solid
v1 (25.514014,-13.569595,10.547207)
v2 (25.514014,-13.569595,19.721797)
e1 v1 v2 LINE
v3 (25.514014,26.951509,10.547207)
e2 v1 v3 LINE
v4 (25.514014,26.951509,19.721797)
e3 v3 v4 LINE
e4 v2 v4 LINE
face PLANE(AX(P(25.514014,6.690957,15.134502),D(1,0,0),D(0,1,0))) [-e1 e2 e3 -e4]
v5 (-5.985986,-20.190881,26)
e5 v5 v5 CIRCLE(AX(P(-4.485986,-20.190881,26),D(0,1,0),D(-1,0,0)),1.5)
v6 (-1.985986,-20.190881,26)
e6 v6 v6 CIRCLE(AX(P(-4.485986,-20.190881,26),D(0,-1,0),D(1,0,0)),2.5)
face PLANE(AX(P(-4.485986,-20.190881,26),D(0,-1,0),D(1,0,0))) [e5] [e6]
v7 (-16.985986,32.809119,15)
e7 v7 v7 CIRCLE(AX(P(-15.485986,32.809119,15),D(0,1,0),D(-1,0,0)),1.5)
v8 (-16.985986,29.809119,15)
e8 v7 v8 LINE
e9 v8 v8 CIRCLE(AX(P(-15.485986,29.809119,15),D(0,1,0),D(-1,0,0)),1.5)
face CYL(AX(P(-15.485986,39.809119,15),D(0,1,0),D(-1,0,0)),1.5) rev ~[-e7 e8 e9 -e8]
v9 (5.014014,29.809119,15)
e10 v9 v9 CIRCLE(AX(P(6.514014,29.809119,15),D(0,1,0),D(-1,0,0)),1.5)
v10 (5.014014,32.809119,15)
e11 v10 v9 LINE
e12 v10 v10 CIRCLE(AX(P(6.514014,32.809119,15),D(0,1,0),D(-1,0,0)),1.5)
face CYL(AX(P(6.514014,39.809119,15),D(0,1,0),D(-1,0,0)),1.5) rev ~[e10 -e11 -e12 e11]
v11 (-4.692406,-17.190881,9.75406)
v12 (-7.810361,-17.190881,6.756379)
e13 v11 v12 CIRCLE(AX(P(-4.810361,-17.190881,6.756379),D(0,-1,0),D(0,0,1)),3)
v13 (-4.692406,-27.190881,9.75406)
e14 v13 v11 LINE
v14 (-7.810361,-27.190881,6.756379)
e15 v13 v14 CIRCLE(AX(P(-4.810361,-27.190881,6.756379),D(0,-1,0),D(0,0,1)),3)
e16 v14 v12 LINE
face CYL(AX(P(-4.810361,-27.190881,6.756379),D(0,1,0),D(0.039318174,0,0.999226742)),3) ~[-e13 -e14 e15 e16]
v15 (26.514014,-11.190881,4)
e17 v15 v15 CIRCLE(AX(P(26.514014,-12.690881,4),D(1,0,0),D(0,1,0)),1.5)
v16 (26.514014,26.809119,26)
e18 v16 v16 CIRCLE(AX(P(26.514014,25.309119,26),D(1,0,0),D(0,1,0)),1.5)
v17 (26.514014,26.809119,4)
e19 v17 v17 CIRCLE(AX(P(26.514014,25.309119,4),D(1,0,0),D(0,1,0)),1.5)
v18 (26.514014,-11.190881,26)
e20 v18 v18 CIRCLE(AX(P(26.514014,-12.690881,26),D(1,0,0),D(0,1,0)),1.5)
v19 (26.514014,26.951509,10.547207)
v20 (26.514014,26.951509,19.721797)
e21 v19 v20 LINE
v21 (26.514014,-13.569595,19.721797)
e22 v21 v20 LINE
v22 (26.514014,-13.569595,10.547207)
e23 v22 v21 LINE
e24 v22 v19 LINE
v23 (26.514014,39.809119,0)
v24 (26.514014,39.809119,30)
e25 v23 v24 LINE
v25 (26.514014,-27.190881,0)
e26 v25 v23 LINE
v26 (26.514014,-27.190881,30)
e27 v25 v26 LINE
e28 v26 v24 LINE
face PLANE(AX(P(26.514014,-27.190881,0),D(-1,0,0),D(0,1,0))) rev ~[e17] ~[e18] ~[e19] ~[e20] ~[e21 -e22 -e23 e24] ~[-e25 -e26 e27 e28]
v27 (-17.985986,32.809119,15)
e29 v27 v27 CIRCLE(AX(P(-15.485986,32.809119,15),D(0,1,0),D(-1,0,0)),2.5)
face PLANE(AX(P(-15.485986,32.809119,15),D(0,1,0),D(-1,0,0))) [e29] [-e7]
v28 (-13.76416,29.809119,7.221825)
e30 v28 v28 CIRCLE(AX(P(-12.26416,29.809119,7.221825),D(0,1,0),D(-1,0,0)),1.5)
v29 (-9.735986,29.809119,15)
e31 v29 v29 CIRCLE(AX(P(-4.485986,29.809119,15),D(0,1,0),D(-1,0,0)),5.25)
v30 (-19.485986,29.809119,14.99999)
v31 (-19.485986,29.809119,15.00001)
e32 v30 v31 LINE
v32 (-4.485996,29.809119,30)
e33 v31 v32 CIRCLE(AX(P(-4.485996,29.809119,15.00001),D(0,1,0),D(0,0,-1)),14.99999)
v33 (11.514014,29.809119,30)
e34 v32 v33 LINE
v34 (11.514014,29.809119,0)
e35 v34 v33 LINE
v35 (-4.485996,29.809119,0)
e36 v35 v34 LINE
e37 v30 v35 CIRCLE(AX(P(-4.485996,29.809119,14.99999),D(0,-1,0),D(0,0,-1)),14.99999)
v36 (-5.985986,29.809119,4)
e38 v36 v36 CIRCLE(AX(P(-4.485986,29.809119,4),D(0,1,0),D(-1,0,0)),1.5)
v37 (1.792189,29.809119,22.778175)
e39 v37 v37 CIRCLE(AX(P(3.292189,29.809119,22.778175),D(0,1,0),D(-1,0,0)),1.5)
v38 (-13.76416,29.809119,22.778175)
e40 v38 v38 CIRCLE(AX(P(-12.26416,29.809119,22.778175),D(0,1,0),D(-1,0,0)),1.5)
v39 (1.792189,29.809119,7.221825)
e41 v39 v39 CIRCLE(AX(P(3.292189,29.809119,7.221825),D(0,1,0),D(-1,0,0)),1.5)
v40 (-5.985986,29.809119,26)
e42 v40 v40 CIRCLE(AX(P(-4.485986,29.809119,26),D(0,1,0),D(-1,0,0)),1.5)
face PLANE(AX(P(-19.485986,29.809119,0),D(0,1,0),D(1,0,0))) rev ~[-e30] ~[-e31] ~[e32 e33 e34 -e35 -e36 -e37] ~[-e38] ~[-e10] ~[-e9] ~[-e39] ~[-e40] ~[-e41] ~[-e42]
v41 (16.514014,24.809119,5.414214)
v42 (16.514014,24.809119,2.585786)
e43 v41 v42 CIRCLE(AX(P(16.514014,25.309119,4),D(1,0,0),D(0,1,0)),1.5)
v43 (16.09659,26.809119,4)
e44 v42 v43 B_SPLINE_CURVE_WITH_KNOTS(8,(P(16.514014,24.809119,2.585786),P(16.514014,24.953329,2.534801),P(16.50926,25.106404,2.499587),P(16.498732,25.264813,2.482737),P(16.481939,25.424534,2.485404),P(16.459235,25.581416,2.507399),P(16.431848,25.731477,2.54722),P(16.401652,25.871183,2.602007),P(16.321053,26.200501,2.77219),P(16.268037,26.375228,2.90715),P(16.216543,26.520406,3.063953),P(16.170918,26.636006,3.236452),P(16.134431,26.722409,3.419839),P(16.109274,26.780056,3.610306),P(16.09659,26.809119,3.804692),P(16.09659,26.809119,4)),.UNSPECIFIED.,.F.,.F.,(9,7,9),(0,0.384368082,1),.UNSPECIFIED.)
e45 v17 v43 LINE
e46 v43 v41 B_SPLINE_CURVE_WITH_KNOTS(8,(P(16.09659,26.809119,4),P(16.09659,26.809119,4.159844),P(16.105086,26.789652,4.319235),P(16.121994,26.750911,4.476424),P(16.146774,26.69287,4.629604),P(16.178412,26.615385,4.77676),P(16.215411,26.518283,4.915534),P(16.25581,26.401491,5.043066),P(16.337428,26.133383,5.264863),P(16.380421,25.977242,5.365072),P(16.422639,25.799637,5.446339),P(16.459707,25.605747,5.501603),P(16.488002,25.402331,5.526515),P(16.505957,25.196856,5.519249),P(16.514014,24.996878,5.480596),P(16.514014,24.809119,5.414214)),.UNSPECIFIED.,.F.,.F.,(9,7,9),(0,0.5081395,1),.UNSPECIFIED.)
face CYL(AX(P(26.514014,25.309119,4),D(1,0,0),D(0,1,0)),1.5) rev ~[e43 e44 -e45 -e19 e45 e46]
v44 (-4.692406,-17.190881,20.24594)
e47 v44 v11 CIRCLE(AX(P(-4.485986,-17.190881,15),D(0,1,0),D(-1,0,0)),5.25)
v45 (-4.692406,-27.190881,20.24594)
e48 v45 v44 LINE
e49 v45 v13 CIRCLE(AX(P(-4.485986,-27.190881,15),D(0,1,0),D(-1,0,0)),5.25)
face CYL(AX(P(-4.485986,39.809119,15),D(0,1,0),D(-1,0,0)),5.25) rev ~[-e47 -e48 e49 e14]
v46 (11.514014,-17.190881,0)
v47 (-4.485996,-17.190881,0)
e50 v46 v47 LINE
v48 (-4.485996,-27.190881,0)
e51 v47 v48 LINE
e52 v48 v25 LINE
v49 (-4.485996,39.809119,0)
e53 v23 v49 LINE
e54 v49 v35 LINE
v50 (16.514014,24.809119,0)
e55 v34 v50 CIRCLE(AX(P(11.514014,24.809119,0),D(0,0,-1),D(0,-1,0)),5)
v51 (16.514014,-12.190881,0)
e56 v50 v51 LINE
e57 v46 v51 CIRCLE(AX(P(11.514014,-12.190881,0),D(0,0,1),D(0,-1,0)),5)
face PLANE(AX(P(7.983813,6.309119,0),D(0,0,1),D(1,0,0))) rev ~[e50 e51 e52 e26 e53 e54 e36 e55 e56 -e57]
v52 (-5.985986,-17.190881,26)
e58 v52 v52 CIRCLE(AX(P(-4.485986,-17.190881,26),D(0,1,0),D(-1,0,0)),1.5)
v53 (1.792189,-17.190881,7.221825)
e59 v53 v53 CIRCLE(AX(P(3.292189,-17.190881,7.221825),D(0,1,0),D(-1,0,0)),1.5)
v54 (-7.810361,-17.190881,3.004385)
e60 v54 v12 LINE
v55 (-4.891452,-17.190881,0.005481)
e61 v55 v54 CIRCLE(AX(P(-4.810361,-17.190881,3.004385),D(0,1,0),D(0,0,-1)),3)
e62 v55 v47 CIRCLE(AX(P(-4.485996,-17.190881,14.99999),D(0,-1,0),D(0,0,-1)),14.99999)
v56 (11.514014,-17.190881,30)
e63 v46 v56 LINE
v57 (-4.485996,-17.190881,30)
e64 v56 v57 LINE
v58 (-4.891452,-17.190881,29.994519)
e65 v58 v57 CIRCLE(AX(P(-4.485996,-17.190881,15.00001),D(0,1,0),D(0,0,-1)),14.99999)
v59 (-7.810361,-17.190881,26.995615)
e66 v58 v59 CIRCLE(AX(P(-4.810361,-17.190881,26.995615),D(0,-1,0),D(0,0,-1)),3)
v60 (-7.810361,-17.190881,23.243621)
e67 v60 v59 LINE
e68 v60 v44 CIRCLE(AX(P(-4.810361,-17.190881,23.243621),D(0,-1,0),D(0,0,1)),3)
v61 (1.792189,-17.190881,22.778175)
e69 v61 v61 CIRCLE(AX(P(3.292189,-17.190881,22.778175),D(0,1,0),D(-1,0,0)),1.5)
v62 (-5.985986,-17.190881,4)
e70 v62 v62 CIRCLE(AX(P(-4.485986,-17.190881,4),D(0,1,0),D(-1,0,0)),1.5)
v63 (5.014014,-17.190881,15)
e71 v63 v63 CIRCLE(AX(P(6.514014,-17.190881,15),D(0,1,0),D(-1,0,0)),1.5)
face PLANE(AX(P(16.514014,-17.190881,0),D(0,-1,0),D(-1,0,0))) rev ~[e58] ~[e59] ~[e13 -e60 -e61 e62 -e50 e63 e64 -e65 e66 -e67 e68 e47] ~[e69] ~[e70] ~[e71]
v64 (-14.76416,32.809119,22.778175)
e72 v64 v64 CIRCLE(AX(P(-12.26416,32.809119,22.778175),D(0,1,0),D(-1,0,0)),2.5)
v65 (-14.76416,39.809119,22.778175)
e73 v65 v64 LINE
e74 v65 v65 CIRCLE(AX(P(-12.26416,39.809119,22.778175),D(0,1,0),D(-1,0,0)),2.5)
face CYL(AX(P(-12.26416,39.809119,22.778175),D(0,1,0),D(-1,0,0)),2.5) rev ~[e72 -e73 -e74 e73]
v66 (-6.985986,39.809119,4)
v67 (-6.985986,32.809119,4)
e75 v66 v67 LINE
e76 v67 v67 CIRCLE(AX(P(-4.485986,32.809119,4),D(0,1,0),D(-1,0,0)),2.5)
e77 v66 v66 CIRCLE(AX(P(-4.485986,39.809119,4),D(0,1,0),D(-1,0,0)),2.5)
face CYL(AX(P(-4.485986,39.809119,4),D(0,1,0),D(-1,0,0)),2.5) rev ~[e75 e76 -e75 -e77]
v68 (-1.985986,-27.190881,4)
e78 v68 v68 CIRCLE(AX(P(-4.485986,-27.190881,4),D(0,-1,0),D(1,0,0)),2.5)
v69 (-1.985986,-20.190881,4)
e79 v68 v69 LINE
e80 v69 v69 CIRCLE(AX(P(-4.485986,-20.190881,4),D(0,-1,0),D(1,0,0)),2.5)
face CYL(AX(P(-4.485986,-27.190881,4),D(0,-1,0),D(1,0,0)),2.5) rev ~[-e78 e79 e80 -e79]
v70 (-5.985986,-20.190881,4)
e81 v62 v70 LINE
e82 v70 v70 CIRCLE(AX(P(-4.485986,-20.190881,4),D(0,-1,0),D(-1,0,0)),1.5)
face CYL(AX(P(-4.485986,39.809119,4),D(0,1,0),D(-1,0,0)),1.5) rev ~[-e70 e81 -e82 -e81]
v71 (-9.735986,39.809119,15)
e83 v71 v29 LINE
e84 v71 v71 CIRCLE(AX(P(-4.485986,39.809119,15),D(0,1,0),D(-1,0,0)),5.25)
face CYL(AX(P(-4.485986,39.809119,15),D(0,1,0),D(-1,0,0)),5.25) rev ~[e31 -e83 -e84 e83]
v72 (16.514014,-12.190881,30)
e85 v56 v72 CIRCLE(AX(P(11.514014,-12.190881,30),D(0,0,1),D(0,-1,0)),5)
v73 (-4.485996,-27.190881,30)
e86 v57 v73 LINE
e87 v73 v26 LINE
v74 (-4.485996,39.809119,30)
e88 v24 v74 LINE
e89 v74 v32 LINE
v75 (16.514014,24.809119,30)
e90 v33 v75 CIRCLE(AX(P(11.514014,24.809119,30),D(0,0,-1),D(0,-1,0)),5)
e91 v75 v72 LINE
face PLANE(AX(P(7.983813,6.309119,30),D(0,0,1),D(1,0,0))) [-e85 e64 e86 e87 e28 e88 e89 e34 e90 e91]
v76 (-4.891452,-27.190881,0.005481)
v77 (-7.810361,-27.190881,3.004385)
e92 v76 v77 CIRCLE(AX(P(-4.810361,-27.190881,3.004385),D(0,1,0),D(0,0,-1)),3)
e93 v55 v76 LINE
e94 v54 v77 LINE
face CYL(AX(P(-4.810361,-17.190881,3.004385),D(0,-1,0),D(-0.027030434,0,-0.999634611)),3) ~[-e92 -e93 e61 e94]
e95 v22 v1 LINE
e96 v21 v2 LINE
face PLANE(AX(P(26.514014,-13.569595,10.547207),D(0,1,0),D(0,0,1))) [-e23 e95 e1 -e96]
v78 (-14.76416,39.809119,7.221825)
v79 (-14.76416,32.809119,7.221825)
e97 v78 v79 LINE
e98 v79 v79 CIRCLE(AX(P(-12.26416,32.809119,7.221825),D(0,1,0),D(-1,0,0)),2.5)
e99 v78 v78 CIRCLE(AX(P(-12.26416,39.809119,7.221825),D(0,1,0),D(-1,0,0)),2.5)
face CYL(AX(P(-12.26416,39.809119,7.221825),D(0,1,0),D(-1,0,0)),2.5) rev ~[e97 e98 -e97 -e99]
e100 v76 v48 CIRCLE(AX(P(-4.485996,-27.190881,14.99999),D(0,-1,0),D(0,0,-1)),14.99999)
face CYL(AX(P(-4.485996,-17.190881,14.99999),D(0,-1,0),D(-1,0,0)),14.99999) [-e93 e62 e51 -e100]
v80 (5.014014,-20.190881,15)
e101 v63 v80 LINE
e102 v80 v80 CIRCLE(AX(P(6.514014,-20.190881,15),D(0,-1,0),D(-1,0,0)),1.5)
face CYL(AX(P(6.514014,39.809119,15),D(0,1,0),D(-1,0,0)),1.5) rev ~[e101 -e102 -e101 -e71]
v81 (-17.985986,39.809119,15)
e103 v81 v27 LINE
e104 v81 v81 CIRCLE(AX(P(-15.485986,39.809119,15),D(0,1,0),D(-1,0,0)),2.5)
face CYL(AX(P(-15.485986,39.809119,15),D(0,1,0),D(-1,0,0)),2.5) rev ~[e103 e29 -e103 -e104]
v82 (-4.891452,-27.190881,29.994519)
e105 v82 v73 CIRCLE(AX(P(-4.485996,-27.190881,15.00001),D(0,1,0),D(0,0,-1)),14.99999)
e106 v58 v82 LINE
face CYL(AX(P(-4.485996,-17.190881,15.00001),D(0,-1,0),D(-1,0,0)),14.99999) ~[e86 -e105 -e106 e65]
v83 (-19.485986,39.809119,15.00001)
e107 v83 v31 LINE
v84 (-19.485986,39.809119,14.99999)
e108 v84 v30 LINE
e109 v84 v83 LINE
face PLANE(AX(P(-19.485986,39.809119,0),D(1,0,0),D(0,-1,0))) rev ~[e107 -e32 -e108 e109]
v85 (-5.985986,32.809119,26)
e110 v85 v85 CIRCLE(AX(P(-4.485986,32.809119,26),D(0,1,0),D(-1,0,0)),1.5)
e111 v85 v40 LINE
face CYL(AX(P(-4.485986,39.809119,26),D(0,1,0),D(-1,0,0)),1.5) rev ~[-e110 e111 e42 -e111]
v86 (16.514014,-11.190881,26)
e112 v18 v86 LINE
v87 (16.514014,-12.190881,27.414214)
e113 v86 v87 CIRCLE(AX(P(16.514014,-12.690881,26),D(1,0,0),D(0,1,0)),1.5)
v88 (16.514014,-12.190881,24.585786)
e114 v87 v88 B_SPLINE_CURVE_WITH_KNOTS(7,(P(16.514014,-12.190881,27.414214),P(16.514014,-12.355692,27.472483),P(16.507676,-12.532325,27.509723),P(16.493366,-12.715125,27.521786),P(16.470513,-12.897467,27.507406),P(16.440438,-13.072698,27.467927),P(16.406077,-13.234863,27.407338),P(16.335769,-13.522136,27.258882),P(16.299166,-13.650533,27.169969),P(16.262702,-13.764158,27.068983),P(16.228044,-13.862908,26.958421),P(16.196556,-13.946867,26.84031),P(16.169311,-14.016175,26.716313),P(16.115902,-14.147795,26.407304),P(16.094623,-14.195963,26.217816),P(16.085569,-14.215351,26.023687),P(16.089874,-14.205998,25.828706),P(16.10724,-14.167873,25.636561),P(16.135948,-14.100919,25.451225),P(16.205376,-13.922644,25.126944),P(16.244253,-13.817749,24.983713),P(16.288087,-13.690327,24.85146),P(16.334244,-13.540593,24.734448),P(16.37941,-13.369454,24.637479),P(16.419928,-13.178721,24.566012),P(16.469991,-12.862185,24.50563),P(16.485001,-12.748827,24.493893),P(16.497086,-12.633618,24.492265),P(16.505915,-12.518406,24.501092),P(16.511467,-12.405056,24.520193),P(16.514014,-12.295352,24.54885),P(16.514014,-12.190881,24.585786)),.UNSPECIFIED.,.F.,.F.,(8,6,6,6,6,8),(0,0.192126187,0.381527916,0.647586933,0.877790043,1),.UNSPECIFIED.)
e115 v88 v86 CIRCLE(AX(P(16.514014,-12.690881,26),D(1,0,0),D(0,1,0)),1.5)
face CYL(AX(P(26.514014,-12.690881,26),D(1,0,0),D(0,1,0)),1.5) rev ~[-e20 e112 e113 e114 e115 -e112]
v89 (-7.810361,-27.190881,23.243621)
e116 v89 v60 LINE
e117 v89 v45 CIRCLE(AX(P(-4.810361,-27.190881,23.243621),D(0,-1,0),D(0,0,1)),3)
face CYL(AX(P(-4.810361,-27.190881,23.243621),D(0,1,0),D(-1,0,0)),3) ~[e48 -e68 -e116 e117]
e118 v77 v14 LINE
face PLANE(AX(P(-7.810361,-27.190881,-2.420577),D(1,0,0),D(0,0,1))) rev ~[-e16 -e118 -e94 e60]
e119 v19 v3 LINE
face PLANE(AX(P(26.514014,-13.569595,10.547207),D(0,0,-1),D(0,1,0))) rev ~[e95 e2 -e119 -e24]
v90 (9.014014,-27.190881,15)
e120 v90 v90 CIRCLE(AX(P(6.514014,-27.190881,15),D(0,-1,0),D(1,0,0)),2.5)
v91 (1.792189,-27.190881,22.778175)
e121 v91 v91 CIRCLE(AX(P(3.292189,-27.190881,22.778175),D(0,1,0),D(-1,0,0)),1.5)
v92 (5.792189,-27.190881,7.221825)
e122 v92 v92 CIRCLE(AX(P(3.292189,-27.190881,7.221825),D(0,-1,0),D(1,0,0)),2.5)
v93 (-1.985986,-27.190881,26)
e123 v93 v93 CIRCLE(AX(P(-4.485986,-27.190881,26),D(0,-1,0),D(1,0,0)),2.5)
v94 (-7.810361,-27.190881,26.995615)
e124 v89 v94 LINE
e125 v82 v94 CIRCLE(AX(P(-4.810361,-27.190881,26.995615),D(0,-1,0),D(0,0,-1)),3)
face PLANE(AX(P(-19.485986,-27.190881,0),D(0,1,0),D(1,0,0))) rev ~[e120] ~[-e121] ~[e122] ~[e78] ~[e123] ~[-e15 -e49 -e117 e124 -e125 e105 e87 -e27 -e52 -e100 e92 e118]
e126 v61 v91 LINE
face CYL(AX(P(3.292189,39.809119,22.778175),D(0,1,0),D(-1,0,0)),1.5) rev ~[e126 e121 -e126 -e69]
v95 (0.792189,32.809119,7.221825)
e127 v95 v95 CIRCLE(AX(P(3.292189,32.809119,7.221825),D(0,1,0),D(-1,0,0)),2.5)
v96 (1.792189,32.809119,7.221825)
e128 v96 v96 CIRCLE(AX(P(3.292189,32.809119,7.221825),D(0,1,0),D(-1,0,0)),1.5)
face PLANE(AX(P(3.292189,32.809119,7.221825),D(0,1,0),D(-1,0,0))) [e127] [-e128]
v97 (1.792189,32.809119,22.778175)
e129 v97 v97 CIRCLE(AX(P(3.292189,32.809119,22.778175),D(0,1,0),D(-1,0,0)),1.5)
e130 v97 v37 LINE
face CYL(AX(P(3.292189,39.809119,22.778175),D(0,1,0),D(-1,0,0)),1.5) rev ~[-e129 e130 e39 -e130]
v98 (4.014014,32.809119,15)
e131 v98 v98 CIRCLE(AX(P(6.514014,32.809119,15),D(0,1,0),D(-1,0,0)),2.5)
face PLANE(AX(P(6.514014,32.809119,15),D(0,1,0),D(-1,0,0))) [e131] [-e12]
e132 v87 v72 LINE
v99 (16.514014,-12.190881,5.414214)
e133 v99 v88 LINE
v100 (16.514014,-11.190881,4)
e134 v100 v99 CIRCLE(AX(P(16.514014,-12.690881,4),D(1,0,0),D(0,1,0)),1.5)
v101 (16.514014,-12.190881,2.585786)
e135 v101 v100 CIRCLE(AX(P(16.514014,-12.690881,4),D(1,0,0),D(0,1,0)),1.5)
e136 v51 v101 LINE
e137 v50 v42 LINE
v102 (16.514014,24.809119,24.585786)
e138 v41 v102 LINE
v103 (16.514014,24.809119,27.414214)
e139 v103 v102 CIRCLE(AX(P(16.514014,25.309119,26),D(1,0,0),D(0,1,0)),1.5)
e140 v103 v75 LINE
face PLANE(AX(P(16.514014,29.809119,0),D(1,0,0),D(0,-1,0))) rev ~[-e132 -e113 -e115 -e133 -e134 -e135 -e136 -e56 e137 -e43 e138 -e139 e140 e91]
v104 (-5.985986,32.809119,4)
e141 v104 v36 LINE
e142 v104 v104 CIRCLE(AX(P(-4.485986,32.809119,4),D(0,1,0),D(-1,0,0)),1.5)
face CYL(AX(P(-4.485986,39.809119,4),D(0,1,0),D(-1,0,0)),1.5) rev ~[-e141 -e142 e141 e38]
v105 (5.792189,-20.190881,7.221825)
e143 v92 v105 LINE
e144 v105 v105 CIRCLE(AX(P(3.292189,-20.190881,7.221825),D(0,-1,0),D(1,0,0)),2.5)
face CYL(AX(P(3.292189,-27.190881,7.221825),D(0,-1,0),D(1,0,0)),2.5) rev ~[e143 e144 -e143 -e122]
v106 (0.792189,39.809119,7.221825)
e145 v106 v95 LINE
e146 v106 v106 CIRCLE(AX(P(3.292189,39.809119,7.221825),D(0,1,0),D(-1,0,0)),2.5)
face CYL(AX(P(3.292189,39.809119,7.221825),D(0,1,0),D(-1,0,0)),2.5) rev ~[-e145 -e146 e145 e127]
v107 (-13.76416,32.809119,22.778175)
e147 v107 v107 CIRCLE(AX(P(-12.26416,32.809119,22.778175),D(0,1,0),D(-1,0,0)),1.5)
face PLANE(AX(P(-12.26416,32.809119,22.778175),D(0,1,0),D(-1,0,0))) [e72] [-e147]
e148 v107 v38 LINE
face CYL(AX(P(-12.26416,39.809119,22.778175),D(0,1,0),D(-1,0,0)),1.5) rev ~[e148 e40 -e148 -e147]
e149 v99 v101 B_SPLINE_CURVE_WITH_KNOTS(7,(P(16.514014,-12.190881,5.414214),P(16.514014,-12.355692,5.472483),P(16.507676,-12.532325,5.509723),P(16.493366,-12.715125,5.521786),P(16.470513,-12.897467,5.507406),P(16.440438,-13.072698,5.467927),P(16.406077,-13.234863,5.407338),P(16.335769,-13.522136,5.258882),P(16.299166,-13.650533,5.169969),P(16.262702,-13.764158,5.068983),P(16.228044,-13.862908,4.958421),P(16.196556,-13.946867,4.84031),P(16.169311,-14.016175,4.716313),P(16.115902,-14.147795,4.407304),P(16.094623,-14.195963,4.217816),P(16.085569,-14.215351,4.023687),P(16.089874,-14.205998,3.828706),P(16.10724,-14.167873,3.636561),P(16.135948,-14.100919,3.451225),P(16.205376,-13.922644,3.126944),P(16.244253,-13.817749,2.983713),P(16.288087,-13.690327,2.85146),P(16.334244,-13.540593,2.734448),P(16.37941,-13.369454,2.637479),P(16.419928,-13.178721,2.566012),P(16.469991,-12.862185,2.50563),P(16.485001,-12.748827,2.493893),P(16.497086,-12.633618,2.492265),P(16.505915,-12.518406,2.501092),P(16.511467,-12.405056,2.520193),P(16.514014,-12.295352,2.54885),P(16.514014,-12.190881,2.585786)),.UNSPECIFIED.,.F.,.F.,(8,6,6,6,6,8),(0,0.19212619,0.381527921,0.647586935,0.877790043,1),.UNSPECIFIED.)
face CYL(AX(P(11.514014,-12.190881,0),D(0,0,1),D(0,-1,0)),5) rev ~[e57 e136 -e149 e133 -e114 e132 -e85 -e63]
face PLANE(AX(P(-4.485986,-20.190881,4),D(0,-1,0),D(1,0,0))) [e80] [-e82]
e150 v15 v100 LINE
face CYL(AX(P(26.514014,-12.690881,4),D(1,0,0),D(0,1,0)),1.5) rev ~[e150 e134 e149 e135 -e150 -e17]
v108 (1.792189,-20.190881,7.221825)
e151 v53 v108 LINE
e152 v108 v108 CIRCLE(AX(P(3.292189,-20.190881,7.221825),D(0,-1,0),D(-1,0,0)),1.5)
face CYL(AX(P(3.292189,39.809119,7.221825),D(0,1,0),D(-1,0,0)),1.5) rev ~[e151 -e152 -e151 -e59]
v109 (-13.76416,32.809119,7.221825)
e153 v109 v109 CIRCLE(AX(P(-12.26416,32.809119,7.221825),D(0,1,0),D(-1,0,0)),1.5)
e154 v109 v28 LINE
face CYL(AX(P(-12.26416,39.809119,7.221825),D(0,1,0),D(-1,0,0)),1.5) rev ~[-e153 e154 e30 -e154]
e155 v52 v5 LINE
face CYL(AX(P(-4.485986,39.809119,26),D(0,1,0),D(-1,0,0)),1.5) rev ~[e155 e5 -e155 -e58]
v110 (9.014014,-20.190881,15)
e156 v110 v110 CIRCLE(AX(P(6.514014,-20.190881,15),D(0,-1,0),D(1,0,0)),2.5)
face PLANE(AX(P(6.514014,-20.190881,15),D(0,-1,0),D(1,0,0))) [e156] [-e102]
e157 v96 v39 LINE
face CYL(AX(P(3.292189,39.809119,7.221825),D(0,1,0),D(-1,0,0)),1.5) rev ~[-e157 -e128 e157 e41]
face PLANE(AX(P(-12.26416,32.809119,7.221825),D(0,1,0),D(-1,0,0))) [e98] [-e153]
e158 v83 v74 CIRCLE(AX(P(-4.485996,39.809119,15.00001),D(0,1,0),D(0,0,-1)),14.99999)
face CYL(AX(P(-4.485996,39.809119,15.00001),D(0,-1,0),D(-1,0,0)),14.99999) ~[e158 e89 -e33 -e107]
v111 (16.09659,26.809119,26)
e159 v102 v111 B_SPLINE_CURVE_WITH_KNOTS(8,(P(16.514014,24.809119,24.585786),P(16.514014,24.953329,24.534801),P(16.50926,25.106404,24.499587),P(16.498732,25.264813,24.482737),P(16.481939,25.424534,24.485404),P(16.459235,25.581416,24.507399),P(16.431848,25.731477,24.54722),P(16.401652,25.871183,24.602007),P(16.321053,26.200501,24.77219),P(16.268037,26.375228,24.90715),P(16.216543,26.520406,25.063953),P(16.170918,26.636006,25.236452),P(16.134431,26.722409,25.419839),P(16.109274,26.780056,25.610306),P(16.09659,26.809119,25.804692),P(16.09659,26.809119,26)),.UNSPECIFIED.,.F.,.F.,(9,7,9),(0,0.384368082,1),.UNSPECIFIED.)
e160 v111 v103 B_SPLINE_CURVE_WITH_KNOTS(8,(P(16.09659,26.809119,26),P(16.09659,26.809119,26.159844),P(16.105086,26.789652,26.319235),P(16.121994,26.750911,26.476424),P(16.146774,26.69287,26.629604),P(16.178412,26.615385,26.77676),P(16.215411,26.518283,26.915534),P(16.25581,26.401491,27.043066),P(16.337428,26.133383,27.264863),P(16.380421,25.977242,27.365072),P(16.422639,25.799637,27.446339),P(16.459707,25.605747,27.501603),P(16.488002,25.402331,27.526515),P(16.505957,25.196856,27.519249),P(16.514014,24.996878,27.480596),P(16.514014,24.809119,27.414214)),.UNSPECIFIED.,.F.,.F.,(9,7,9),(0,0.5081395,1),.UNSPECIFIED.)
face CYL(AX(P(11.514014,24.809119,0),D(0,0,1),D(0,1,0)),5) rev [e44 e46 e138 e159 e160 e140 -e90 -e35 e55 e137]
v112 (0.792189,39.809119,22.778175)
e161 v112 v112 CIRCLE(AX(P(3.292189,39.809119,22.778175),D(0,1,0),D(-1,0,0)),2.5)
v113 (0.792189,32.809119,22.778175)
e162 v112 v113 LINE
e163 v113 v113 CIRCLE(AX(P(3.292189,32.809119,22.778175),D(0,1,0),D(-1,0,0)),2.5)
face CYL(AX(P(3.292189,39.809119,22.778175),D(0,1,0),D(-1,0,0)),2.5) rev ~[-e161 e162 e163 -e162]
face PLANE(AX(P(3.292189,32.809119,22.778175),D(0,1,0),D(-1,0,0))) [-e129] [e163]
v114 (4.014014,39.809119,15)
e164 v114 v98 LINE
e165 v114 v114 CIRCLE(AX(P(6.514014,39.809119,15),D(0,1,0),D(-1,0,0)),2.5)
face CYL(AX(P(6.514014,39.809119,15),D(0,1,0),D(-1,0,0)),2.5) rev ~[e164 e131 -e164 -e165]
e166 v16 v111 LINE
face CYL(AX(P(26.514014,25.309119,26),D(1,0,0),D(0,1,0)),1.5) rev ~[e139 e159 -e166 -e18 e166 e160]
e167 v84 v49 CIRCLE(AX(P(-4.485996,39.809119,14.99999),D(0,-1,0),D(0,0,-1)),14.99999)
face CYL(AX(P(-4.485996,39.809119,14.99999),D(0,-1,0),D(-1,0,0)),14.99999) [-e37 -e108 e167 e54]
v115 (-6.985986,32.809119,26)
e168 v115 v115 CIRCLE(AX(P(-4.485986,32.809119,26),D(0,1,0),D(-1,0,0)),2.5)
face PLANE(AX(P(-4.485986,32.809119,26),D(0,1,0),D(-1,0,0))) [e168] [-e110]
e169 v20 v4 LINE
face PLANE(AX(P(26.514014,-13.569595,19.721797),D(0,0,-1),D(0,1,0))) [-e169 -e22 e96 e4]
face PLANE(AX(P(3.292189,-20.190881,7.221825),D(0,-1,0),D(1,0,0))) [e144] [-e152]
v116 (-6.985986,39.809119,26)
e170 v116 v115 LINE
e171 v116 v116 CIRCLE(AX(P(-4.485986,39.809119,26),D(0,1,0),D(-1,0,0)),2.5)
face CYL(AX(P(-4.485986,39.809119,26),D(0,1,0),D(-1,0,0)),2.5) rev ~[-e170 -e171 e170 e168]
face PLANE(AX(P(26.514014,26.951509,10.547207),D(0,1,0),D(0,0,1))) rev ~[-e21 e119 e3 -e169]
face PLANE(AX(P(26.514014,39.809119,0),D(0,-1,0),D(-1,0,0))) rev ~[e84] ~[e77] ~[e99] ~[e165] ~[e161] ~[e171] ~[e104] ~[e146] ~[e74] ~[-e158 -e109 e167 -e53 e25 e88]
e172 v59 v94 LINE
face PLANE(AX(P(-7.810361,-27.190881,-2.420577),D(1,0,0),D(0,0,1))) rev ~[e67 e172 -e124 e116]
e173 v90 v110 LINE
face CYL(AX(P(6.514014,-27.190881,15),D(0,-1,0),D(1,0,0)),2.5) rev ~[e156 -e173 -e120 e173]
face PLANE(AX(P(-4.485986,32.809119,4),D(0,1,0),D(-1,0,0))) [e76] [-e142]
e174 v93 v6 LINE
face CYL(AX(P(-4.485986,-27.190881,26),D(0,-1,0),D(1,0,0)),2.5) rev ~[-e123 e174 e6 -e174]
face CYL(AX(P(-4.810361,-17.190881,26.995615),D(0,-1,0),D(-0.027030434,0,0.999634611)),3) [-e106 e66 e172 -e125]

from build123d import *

# Parameters (mm, degrees)
F1_DEPTH  = 30
F2_R      = 14.99999
F3_R      = 5.25
F4_DEPTH  = 100
F5_R      = 2.5
F6_DEPTH  = 7
F7_DEPTH  = 7
F8_R      = 1.5
F9_DEPTH  = 100
F10_R     = 2.5
F10_R_2   = 1.5
F11_DEPTH = 7
F12_W     = 19.7517806664
F12_H     = 36.5692139603
F13_DEPTH = 25
F14_R     = 3
F15_R     = 5
F16_R     = 1.5
F17_DEPTH = 25
F18_W     = 40.5211038888
F18_H     = 9.174589999
F19_DEPTH = 1


# Not quite as in the source:
# - a fillet or chamfer is up to 0.001 mm smaller than in the source, because OpenCascade refuses the exact size


with BuildPart() as f1:
    # F0 (on Top) → F1 (new body)
    with BuildSketch(Plane.XY):
        Polygon((26.5140141845, 39.809118801), (-19.4859858155, 39.809118801), (-19.4859858155, 29.809118801), (16.5140141845, 29.809118801), (16.5140141845, -17.190881199), (-19.4859858155, -17.190881199), (-19.4859858155, -27.190881199), (26.5140141845, -27.190881199), align=None)
    extrude(amount=F1_DEPTH)

    # F2 (radius 15 in the source; OpenCascade refuses exactly that, so slightly less here)
    f2_edges = [f1.edges().sort_by_distance(p)[0] for p in [
        (-19.485986, 34.809119, 30),
        (-19.485986, 34.809119, 0),
        (-19.485986, -22.190881, 30),
        (-19.485986, -22.190881, 0),
    ]]
    fillet(f2_edges, radius=F2_R)

    # F3 (on face) → F4 (cut)
    with BuildSketch(Plane(origin=(0, 39.809118801, 0), x_dir=(-1, 0, 0), z_dir=(0, 1, 0))):
        with Locations((4.4859858155, 15)):
            Circle(F3_R)
    extrude(amount=-F4_DEPTH, mode=Mode.SUBTRACT)

    # F5 (on face) → F6 (cut)
    with BuildSketch(Plane(origin=(0, 39.809118801, 0), x_dir=(-1, 0, 0), z_dir=(0, 1, 0))):
        with Locations((4.4859858155, 26)):
            Circle(F5_R)
    extrude(amount=-F6_DEPTH, mode=Mode.SUBTRACT)

    # F5 (on face) → F7 (cut)
    with BuildSketch(Plane(origin=(0, 39.809118801, 0), x_dir=(-1, 0, 0), z_dir=(0, 1, 0))):
        with Locations((-3.2921887775, 22.7781745931)):
            Circle(F5_R)
        with Locations((-6.5140141845, 15)):
            Circle(F5_R)
        with Locations((-3.2921887775, 7.2218254069)):
            Circle(F5_R)
        with Locations((4.4859858155, 4)):
            Circle(F5_R)
        with Locations((12.2641604086, 7.2218254069)):
            Circle(F5_R)
        with Locations((15.4859858155, 15)):
            Circle(F5_R)
        with Locations((12.2641604086, 22.7781745931)):
            Circle(F5_R)
    extrude(amount=-F7_DEPTH, mode=Mode.SUBTRACT)

    # F8 (on face) → F9 (cut)
    with BuildSketch(Plane(origin=(0, 39.809118801, 0), x_dir=(-1, 0, 0), z_dir=(0, 1, 0))):
        with Locations((4.4859858155, 26)):
            Circle(F8_R)
        with Locations((12.2641604086, 22.7781745931)):
            Circle(F8_R)
        with Locations((15.4859858155, 15)):
            Circle(F8_R)
        with Locations((12.2641604086, 7.2218254069)):
            Circle(F8_R)
        with Locations((4.4859858155, 4)):
            Circle(F8_R)
        with Locations((-3.2921887775, 7.2218254069)):
            Circle(F8_R)
        with Locations((-6.5140141845, 15)):
            Circle(F8_R)
        with Locations((-3.2921887775, 22.7781745931)):
            Circle(F8_R)
    extrude(amount=-F9_DEPTH, mode=Mode.SUBTRACT)

    # F10 (on face) → F11 (cut)
    with BuildSketch(Plane.XZ.offset(27.190881199)):
        with Locations((-4.4859858155, 26)):
            Circle(F10_R)
        with Locations((-4.4859858155, 26)):
            Circle(F10_R_2, mode=Mode.SUBTRACT)
        with Locations((-12.2641604086, 22.7781745931)):
            Circle(F10_R)
        with Locations((-12.2641604086, 22.7781745931)):
            Circle(F10_R_2, mode=Mode.SUBTRACT)
        with Locations((-15.4859858155, 15)):
            Circle(F10_R)
        with Locations((-15.4859858155, 15)):
            Circle(F10_R_2, mode=Mode.SUBTRACT)
        with Locations((-12.2641604086, 7.2218254069)):
            Circle(F10_R)
        with Locations((-12.2641604086, 7.2218254069)):
            Circle(F10_R_2, mode=Mode.SUBTRACT)
        with Locations((-4.4859858155, 4)):
            Circle(F10_R)
        with Locations((-4.4859858155, 4)):
            Circle(F10_R_2, mode=Mode.SUBTRACT)
        with Locations((3.2921887775, 7.2218254069)):
            Circle(F10_R)
        with Locations((3.2921887775, 7.2218254069)):
            Circle(F10_R_2, mode=Mode.SUBTRACT)
        with Locations((6.5140141845, 15)):
            Circle(F10_R)
        with Locations((6.5140141845, 15)):
            Circle(F10_R_2, mode=Mode.SUBTRACT)
        with Locations((-4.4859858155, 26)):
            Circle(F10_R_2)
    extrude(amount=-F11_DEPTH, mode=Mode.SUBTRACT)

    # F12 (on face) → F13 (cut)
    with BuildSketch(Plane.XZ.offset(27.190881199)):
        with Locations((-17.6862510853, 15.8640302252)):
            Rectangle(F12_W, F12_H)
    extrude(amount=-F13_DEPTH, mode=Mode.SUBTRACT)

    # F14
    f14_edges = [f1.edges().sort_by_distance(p)[0] for p in [
        (-7.810361, -22.190881, 29.626982),
        (-7.810361, -22.190881, 0.373018),
        (-7.810361, -22.190881, 10.936623),
        (-7.810361, -22.190881, 19.063377),
    ]]
    fillet(f14_edges, radius=F14_R)

    # F15
    f15_edges = [f1.edges().sort_by_distance(p)[0] for p in [
        (16.514014, 29.809119, 15),
        (16.514014, -17.190881, 15),
    ]]
    fillet(f15_edges, radius=F15_R)

    # F16 (on face) → F17 (cut)
    with BuildSketch(Plane.YZ.offset(26.5140141845)):
        with Locations((-12.690881199, 26)):
            Circle(F16_R)
        with Locations((-12.690881199, 4)):
            Circle(F16_R)
        with Locations((25.309118801, 4)):
            Circle(F16_R)
        with Locations((25.309118801, 26)):
            Circle(F16_R)
    extrude(amount=-F17_DEPTH, mode=Mode.SUBTRACT)

    # F18 (on face) → F19 (cut)
    with BuildSketch(Plane.YZ.offset(26.5140141845)):
        with Locations((6.6909566522, 15.1345017366)):
            Rectangle(F18_W, F18_H)
    extrude(amount=-F19_DEPTH, mode=Mode.SUBTRACT)


solid = f1.part
